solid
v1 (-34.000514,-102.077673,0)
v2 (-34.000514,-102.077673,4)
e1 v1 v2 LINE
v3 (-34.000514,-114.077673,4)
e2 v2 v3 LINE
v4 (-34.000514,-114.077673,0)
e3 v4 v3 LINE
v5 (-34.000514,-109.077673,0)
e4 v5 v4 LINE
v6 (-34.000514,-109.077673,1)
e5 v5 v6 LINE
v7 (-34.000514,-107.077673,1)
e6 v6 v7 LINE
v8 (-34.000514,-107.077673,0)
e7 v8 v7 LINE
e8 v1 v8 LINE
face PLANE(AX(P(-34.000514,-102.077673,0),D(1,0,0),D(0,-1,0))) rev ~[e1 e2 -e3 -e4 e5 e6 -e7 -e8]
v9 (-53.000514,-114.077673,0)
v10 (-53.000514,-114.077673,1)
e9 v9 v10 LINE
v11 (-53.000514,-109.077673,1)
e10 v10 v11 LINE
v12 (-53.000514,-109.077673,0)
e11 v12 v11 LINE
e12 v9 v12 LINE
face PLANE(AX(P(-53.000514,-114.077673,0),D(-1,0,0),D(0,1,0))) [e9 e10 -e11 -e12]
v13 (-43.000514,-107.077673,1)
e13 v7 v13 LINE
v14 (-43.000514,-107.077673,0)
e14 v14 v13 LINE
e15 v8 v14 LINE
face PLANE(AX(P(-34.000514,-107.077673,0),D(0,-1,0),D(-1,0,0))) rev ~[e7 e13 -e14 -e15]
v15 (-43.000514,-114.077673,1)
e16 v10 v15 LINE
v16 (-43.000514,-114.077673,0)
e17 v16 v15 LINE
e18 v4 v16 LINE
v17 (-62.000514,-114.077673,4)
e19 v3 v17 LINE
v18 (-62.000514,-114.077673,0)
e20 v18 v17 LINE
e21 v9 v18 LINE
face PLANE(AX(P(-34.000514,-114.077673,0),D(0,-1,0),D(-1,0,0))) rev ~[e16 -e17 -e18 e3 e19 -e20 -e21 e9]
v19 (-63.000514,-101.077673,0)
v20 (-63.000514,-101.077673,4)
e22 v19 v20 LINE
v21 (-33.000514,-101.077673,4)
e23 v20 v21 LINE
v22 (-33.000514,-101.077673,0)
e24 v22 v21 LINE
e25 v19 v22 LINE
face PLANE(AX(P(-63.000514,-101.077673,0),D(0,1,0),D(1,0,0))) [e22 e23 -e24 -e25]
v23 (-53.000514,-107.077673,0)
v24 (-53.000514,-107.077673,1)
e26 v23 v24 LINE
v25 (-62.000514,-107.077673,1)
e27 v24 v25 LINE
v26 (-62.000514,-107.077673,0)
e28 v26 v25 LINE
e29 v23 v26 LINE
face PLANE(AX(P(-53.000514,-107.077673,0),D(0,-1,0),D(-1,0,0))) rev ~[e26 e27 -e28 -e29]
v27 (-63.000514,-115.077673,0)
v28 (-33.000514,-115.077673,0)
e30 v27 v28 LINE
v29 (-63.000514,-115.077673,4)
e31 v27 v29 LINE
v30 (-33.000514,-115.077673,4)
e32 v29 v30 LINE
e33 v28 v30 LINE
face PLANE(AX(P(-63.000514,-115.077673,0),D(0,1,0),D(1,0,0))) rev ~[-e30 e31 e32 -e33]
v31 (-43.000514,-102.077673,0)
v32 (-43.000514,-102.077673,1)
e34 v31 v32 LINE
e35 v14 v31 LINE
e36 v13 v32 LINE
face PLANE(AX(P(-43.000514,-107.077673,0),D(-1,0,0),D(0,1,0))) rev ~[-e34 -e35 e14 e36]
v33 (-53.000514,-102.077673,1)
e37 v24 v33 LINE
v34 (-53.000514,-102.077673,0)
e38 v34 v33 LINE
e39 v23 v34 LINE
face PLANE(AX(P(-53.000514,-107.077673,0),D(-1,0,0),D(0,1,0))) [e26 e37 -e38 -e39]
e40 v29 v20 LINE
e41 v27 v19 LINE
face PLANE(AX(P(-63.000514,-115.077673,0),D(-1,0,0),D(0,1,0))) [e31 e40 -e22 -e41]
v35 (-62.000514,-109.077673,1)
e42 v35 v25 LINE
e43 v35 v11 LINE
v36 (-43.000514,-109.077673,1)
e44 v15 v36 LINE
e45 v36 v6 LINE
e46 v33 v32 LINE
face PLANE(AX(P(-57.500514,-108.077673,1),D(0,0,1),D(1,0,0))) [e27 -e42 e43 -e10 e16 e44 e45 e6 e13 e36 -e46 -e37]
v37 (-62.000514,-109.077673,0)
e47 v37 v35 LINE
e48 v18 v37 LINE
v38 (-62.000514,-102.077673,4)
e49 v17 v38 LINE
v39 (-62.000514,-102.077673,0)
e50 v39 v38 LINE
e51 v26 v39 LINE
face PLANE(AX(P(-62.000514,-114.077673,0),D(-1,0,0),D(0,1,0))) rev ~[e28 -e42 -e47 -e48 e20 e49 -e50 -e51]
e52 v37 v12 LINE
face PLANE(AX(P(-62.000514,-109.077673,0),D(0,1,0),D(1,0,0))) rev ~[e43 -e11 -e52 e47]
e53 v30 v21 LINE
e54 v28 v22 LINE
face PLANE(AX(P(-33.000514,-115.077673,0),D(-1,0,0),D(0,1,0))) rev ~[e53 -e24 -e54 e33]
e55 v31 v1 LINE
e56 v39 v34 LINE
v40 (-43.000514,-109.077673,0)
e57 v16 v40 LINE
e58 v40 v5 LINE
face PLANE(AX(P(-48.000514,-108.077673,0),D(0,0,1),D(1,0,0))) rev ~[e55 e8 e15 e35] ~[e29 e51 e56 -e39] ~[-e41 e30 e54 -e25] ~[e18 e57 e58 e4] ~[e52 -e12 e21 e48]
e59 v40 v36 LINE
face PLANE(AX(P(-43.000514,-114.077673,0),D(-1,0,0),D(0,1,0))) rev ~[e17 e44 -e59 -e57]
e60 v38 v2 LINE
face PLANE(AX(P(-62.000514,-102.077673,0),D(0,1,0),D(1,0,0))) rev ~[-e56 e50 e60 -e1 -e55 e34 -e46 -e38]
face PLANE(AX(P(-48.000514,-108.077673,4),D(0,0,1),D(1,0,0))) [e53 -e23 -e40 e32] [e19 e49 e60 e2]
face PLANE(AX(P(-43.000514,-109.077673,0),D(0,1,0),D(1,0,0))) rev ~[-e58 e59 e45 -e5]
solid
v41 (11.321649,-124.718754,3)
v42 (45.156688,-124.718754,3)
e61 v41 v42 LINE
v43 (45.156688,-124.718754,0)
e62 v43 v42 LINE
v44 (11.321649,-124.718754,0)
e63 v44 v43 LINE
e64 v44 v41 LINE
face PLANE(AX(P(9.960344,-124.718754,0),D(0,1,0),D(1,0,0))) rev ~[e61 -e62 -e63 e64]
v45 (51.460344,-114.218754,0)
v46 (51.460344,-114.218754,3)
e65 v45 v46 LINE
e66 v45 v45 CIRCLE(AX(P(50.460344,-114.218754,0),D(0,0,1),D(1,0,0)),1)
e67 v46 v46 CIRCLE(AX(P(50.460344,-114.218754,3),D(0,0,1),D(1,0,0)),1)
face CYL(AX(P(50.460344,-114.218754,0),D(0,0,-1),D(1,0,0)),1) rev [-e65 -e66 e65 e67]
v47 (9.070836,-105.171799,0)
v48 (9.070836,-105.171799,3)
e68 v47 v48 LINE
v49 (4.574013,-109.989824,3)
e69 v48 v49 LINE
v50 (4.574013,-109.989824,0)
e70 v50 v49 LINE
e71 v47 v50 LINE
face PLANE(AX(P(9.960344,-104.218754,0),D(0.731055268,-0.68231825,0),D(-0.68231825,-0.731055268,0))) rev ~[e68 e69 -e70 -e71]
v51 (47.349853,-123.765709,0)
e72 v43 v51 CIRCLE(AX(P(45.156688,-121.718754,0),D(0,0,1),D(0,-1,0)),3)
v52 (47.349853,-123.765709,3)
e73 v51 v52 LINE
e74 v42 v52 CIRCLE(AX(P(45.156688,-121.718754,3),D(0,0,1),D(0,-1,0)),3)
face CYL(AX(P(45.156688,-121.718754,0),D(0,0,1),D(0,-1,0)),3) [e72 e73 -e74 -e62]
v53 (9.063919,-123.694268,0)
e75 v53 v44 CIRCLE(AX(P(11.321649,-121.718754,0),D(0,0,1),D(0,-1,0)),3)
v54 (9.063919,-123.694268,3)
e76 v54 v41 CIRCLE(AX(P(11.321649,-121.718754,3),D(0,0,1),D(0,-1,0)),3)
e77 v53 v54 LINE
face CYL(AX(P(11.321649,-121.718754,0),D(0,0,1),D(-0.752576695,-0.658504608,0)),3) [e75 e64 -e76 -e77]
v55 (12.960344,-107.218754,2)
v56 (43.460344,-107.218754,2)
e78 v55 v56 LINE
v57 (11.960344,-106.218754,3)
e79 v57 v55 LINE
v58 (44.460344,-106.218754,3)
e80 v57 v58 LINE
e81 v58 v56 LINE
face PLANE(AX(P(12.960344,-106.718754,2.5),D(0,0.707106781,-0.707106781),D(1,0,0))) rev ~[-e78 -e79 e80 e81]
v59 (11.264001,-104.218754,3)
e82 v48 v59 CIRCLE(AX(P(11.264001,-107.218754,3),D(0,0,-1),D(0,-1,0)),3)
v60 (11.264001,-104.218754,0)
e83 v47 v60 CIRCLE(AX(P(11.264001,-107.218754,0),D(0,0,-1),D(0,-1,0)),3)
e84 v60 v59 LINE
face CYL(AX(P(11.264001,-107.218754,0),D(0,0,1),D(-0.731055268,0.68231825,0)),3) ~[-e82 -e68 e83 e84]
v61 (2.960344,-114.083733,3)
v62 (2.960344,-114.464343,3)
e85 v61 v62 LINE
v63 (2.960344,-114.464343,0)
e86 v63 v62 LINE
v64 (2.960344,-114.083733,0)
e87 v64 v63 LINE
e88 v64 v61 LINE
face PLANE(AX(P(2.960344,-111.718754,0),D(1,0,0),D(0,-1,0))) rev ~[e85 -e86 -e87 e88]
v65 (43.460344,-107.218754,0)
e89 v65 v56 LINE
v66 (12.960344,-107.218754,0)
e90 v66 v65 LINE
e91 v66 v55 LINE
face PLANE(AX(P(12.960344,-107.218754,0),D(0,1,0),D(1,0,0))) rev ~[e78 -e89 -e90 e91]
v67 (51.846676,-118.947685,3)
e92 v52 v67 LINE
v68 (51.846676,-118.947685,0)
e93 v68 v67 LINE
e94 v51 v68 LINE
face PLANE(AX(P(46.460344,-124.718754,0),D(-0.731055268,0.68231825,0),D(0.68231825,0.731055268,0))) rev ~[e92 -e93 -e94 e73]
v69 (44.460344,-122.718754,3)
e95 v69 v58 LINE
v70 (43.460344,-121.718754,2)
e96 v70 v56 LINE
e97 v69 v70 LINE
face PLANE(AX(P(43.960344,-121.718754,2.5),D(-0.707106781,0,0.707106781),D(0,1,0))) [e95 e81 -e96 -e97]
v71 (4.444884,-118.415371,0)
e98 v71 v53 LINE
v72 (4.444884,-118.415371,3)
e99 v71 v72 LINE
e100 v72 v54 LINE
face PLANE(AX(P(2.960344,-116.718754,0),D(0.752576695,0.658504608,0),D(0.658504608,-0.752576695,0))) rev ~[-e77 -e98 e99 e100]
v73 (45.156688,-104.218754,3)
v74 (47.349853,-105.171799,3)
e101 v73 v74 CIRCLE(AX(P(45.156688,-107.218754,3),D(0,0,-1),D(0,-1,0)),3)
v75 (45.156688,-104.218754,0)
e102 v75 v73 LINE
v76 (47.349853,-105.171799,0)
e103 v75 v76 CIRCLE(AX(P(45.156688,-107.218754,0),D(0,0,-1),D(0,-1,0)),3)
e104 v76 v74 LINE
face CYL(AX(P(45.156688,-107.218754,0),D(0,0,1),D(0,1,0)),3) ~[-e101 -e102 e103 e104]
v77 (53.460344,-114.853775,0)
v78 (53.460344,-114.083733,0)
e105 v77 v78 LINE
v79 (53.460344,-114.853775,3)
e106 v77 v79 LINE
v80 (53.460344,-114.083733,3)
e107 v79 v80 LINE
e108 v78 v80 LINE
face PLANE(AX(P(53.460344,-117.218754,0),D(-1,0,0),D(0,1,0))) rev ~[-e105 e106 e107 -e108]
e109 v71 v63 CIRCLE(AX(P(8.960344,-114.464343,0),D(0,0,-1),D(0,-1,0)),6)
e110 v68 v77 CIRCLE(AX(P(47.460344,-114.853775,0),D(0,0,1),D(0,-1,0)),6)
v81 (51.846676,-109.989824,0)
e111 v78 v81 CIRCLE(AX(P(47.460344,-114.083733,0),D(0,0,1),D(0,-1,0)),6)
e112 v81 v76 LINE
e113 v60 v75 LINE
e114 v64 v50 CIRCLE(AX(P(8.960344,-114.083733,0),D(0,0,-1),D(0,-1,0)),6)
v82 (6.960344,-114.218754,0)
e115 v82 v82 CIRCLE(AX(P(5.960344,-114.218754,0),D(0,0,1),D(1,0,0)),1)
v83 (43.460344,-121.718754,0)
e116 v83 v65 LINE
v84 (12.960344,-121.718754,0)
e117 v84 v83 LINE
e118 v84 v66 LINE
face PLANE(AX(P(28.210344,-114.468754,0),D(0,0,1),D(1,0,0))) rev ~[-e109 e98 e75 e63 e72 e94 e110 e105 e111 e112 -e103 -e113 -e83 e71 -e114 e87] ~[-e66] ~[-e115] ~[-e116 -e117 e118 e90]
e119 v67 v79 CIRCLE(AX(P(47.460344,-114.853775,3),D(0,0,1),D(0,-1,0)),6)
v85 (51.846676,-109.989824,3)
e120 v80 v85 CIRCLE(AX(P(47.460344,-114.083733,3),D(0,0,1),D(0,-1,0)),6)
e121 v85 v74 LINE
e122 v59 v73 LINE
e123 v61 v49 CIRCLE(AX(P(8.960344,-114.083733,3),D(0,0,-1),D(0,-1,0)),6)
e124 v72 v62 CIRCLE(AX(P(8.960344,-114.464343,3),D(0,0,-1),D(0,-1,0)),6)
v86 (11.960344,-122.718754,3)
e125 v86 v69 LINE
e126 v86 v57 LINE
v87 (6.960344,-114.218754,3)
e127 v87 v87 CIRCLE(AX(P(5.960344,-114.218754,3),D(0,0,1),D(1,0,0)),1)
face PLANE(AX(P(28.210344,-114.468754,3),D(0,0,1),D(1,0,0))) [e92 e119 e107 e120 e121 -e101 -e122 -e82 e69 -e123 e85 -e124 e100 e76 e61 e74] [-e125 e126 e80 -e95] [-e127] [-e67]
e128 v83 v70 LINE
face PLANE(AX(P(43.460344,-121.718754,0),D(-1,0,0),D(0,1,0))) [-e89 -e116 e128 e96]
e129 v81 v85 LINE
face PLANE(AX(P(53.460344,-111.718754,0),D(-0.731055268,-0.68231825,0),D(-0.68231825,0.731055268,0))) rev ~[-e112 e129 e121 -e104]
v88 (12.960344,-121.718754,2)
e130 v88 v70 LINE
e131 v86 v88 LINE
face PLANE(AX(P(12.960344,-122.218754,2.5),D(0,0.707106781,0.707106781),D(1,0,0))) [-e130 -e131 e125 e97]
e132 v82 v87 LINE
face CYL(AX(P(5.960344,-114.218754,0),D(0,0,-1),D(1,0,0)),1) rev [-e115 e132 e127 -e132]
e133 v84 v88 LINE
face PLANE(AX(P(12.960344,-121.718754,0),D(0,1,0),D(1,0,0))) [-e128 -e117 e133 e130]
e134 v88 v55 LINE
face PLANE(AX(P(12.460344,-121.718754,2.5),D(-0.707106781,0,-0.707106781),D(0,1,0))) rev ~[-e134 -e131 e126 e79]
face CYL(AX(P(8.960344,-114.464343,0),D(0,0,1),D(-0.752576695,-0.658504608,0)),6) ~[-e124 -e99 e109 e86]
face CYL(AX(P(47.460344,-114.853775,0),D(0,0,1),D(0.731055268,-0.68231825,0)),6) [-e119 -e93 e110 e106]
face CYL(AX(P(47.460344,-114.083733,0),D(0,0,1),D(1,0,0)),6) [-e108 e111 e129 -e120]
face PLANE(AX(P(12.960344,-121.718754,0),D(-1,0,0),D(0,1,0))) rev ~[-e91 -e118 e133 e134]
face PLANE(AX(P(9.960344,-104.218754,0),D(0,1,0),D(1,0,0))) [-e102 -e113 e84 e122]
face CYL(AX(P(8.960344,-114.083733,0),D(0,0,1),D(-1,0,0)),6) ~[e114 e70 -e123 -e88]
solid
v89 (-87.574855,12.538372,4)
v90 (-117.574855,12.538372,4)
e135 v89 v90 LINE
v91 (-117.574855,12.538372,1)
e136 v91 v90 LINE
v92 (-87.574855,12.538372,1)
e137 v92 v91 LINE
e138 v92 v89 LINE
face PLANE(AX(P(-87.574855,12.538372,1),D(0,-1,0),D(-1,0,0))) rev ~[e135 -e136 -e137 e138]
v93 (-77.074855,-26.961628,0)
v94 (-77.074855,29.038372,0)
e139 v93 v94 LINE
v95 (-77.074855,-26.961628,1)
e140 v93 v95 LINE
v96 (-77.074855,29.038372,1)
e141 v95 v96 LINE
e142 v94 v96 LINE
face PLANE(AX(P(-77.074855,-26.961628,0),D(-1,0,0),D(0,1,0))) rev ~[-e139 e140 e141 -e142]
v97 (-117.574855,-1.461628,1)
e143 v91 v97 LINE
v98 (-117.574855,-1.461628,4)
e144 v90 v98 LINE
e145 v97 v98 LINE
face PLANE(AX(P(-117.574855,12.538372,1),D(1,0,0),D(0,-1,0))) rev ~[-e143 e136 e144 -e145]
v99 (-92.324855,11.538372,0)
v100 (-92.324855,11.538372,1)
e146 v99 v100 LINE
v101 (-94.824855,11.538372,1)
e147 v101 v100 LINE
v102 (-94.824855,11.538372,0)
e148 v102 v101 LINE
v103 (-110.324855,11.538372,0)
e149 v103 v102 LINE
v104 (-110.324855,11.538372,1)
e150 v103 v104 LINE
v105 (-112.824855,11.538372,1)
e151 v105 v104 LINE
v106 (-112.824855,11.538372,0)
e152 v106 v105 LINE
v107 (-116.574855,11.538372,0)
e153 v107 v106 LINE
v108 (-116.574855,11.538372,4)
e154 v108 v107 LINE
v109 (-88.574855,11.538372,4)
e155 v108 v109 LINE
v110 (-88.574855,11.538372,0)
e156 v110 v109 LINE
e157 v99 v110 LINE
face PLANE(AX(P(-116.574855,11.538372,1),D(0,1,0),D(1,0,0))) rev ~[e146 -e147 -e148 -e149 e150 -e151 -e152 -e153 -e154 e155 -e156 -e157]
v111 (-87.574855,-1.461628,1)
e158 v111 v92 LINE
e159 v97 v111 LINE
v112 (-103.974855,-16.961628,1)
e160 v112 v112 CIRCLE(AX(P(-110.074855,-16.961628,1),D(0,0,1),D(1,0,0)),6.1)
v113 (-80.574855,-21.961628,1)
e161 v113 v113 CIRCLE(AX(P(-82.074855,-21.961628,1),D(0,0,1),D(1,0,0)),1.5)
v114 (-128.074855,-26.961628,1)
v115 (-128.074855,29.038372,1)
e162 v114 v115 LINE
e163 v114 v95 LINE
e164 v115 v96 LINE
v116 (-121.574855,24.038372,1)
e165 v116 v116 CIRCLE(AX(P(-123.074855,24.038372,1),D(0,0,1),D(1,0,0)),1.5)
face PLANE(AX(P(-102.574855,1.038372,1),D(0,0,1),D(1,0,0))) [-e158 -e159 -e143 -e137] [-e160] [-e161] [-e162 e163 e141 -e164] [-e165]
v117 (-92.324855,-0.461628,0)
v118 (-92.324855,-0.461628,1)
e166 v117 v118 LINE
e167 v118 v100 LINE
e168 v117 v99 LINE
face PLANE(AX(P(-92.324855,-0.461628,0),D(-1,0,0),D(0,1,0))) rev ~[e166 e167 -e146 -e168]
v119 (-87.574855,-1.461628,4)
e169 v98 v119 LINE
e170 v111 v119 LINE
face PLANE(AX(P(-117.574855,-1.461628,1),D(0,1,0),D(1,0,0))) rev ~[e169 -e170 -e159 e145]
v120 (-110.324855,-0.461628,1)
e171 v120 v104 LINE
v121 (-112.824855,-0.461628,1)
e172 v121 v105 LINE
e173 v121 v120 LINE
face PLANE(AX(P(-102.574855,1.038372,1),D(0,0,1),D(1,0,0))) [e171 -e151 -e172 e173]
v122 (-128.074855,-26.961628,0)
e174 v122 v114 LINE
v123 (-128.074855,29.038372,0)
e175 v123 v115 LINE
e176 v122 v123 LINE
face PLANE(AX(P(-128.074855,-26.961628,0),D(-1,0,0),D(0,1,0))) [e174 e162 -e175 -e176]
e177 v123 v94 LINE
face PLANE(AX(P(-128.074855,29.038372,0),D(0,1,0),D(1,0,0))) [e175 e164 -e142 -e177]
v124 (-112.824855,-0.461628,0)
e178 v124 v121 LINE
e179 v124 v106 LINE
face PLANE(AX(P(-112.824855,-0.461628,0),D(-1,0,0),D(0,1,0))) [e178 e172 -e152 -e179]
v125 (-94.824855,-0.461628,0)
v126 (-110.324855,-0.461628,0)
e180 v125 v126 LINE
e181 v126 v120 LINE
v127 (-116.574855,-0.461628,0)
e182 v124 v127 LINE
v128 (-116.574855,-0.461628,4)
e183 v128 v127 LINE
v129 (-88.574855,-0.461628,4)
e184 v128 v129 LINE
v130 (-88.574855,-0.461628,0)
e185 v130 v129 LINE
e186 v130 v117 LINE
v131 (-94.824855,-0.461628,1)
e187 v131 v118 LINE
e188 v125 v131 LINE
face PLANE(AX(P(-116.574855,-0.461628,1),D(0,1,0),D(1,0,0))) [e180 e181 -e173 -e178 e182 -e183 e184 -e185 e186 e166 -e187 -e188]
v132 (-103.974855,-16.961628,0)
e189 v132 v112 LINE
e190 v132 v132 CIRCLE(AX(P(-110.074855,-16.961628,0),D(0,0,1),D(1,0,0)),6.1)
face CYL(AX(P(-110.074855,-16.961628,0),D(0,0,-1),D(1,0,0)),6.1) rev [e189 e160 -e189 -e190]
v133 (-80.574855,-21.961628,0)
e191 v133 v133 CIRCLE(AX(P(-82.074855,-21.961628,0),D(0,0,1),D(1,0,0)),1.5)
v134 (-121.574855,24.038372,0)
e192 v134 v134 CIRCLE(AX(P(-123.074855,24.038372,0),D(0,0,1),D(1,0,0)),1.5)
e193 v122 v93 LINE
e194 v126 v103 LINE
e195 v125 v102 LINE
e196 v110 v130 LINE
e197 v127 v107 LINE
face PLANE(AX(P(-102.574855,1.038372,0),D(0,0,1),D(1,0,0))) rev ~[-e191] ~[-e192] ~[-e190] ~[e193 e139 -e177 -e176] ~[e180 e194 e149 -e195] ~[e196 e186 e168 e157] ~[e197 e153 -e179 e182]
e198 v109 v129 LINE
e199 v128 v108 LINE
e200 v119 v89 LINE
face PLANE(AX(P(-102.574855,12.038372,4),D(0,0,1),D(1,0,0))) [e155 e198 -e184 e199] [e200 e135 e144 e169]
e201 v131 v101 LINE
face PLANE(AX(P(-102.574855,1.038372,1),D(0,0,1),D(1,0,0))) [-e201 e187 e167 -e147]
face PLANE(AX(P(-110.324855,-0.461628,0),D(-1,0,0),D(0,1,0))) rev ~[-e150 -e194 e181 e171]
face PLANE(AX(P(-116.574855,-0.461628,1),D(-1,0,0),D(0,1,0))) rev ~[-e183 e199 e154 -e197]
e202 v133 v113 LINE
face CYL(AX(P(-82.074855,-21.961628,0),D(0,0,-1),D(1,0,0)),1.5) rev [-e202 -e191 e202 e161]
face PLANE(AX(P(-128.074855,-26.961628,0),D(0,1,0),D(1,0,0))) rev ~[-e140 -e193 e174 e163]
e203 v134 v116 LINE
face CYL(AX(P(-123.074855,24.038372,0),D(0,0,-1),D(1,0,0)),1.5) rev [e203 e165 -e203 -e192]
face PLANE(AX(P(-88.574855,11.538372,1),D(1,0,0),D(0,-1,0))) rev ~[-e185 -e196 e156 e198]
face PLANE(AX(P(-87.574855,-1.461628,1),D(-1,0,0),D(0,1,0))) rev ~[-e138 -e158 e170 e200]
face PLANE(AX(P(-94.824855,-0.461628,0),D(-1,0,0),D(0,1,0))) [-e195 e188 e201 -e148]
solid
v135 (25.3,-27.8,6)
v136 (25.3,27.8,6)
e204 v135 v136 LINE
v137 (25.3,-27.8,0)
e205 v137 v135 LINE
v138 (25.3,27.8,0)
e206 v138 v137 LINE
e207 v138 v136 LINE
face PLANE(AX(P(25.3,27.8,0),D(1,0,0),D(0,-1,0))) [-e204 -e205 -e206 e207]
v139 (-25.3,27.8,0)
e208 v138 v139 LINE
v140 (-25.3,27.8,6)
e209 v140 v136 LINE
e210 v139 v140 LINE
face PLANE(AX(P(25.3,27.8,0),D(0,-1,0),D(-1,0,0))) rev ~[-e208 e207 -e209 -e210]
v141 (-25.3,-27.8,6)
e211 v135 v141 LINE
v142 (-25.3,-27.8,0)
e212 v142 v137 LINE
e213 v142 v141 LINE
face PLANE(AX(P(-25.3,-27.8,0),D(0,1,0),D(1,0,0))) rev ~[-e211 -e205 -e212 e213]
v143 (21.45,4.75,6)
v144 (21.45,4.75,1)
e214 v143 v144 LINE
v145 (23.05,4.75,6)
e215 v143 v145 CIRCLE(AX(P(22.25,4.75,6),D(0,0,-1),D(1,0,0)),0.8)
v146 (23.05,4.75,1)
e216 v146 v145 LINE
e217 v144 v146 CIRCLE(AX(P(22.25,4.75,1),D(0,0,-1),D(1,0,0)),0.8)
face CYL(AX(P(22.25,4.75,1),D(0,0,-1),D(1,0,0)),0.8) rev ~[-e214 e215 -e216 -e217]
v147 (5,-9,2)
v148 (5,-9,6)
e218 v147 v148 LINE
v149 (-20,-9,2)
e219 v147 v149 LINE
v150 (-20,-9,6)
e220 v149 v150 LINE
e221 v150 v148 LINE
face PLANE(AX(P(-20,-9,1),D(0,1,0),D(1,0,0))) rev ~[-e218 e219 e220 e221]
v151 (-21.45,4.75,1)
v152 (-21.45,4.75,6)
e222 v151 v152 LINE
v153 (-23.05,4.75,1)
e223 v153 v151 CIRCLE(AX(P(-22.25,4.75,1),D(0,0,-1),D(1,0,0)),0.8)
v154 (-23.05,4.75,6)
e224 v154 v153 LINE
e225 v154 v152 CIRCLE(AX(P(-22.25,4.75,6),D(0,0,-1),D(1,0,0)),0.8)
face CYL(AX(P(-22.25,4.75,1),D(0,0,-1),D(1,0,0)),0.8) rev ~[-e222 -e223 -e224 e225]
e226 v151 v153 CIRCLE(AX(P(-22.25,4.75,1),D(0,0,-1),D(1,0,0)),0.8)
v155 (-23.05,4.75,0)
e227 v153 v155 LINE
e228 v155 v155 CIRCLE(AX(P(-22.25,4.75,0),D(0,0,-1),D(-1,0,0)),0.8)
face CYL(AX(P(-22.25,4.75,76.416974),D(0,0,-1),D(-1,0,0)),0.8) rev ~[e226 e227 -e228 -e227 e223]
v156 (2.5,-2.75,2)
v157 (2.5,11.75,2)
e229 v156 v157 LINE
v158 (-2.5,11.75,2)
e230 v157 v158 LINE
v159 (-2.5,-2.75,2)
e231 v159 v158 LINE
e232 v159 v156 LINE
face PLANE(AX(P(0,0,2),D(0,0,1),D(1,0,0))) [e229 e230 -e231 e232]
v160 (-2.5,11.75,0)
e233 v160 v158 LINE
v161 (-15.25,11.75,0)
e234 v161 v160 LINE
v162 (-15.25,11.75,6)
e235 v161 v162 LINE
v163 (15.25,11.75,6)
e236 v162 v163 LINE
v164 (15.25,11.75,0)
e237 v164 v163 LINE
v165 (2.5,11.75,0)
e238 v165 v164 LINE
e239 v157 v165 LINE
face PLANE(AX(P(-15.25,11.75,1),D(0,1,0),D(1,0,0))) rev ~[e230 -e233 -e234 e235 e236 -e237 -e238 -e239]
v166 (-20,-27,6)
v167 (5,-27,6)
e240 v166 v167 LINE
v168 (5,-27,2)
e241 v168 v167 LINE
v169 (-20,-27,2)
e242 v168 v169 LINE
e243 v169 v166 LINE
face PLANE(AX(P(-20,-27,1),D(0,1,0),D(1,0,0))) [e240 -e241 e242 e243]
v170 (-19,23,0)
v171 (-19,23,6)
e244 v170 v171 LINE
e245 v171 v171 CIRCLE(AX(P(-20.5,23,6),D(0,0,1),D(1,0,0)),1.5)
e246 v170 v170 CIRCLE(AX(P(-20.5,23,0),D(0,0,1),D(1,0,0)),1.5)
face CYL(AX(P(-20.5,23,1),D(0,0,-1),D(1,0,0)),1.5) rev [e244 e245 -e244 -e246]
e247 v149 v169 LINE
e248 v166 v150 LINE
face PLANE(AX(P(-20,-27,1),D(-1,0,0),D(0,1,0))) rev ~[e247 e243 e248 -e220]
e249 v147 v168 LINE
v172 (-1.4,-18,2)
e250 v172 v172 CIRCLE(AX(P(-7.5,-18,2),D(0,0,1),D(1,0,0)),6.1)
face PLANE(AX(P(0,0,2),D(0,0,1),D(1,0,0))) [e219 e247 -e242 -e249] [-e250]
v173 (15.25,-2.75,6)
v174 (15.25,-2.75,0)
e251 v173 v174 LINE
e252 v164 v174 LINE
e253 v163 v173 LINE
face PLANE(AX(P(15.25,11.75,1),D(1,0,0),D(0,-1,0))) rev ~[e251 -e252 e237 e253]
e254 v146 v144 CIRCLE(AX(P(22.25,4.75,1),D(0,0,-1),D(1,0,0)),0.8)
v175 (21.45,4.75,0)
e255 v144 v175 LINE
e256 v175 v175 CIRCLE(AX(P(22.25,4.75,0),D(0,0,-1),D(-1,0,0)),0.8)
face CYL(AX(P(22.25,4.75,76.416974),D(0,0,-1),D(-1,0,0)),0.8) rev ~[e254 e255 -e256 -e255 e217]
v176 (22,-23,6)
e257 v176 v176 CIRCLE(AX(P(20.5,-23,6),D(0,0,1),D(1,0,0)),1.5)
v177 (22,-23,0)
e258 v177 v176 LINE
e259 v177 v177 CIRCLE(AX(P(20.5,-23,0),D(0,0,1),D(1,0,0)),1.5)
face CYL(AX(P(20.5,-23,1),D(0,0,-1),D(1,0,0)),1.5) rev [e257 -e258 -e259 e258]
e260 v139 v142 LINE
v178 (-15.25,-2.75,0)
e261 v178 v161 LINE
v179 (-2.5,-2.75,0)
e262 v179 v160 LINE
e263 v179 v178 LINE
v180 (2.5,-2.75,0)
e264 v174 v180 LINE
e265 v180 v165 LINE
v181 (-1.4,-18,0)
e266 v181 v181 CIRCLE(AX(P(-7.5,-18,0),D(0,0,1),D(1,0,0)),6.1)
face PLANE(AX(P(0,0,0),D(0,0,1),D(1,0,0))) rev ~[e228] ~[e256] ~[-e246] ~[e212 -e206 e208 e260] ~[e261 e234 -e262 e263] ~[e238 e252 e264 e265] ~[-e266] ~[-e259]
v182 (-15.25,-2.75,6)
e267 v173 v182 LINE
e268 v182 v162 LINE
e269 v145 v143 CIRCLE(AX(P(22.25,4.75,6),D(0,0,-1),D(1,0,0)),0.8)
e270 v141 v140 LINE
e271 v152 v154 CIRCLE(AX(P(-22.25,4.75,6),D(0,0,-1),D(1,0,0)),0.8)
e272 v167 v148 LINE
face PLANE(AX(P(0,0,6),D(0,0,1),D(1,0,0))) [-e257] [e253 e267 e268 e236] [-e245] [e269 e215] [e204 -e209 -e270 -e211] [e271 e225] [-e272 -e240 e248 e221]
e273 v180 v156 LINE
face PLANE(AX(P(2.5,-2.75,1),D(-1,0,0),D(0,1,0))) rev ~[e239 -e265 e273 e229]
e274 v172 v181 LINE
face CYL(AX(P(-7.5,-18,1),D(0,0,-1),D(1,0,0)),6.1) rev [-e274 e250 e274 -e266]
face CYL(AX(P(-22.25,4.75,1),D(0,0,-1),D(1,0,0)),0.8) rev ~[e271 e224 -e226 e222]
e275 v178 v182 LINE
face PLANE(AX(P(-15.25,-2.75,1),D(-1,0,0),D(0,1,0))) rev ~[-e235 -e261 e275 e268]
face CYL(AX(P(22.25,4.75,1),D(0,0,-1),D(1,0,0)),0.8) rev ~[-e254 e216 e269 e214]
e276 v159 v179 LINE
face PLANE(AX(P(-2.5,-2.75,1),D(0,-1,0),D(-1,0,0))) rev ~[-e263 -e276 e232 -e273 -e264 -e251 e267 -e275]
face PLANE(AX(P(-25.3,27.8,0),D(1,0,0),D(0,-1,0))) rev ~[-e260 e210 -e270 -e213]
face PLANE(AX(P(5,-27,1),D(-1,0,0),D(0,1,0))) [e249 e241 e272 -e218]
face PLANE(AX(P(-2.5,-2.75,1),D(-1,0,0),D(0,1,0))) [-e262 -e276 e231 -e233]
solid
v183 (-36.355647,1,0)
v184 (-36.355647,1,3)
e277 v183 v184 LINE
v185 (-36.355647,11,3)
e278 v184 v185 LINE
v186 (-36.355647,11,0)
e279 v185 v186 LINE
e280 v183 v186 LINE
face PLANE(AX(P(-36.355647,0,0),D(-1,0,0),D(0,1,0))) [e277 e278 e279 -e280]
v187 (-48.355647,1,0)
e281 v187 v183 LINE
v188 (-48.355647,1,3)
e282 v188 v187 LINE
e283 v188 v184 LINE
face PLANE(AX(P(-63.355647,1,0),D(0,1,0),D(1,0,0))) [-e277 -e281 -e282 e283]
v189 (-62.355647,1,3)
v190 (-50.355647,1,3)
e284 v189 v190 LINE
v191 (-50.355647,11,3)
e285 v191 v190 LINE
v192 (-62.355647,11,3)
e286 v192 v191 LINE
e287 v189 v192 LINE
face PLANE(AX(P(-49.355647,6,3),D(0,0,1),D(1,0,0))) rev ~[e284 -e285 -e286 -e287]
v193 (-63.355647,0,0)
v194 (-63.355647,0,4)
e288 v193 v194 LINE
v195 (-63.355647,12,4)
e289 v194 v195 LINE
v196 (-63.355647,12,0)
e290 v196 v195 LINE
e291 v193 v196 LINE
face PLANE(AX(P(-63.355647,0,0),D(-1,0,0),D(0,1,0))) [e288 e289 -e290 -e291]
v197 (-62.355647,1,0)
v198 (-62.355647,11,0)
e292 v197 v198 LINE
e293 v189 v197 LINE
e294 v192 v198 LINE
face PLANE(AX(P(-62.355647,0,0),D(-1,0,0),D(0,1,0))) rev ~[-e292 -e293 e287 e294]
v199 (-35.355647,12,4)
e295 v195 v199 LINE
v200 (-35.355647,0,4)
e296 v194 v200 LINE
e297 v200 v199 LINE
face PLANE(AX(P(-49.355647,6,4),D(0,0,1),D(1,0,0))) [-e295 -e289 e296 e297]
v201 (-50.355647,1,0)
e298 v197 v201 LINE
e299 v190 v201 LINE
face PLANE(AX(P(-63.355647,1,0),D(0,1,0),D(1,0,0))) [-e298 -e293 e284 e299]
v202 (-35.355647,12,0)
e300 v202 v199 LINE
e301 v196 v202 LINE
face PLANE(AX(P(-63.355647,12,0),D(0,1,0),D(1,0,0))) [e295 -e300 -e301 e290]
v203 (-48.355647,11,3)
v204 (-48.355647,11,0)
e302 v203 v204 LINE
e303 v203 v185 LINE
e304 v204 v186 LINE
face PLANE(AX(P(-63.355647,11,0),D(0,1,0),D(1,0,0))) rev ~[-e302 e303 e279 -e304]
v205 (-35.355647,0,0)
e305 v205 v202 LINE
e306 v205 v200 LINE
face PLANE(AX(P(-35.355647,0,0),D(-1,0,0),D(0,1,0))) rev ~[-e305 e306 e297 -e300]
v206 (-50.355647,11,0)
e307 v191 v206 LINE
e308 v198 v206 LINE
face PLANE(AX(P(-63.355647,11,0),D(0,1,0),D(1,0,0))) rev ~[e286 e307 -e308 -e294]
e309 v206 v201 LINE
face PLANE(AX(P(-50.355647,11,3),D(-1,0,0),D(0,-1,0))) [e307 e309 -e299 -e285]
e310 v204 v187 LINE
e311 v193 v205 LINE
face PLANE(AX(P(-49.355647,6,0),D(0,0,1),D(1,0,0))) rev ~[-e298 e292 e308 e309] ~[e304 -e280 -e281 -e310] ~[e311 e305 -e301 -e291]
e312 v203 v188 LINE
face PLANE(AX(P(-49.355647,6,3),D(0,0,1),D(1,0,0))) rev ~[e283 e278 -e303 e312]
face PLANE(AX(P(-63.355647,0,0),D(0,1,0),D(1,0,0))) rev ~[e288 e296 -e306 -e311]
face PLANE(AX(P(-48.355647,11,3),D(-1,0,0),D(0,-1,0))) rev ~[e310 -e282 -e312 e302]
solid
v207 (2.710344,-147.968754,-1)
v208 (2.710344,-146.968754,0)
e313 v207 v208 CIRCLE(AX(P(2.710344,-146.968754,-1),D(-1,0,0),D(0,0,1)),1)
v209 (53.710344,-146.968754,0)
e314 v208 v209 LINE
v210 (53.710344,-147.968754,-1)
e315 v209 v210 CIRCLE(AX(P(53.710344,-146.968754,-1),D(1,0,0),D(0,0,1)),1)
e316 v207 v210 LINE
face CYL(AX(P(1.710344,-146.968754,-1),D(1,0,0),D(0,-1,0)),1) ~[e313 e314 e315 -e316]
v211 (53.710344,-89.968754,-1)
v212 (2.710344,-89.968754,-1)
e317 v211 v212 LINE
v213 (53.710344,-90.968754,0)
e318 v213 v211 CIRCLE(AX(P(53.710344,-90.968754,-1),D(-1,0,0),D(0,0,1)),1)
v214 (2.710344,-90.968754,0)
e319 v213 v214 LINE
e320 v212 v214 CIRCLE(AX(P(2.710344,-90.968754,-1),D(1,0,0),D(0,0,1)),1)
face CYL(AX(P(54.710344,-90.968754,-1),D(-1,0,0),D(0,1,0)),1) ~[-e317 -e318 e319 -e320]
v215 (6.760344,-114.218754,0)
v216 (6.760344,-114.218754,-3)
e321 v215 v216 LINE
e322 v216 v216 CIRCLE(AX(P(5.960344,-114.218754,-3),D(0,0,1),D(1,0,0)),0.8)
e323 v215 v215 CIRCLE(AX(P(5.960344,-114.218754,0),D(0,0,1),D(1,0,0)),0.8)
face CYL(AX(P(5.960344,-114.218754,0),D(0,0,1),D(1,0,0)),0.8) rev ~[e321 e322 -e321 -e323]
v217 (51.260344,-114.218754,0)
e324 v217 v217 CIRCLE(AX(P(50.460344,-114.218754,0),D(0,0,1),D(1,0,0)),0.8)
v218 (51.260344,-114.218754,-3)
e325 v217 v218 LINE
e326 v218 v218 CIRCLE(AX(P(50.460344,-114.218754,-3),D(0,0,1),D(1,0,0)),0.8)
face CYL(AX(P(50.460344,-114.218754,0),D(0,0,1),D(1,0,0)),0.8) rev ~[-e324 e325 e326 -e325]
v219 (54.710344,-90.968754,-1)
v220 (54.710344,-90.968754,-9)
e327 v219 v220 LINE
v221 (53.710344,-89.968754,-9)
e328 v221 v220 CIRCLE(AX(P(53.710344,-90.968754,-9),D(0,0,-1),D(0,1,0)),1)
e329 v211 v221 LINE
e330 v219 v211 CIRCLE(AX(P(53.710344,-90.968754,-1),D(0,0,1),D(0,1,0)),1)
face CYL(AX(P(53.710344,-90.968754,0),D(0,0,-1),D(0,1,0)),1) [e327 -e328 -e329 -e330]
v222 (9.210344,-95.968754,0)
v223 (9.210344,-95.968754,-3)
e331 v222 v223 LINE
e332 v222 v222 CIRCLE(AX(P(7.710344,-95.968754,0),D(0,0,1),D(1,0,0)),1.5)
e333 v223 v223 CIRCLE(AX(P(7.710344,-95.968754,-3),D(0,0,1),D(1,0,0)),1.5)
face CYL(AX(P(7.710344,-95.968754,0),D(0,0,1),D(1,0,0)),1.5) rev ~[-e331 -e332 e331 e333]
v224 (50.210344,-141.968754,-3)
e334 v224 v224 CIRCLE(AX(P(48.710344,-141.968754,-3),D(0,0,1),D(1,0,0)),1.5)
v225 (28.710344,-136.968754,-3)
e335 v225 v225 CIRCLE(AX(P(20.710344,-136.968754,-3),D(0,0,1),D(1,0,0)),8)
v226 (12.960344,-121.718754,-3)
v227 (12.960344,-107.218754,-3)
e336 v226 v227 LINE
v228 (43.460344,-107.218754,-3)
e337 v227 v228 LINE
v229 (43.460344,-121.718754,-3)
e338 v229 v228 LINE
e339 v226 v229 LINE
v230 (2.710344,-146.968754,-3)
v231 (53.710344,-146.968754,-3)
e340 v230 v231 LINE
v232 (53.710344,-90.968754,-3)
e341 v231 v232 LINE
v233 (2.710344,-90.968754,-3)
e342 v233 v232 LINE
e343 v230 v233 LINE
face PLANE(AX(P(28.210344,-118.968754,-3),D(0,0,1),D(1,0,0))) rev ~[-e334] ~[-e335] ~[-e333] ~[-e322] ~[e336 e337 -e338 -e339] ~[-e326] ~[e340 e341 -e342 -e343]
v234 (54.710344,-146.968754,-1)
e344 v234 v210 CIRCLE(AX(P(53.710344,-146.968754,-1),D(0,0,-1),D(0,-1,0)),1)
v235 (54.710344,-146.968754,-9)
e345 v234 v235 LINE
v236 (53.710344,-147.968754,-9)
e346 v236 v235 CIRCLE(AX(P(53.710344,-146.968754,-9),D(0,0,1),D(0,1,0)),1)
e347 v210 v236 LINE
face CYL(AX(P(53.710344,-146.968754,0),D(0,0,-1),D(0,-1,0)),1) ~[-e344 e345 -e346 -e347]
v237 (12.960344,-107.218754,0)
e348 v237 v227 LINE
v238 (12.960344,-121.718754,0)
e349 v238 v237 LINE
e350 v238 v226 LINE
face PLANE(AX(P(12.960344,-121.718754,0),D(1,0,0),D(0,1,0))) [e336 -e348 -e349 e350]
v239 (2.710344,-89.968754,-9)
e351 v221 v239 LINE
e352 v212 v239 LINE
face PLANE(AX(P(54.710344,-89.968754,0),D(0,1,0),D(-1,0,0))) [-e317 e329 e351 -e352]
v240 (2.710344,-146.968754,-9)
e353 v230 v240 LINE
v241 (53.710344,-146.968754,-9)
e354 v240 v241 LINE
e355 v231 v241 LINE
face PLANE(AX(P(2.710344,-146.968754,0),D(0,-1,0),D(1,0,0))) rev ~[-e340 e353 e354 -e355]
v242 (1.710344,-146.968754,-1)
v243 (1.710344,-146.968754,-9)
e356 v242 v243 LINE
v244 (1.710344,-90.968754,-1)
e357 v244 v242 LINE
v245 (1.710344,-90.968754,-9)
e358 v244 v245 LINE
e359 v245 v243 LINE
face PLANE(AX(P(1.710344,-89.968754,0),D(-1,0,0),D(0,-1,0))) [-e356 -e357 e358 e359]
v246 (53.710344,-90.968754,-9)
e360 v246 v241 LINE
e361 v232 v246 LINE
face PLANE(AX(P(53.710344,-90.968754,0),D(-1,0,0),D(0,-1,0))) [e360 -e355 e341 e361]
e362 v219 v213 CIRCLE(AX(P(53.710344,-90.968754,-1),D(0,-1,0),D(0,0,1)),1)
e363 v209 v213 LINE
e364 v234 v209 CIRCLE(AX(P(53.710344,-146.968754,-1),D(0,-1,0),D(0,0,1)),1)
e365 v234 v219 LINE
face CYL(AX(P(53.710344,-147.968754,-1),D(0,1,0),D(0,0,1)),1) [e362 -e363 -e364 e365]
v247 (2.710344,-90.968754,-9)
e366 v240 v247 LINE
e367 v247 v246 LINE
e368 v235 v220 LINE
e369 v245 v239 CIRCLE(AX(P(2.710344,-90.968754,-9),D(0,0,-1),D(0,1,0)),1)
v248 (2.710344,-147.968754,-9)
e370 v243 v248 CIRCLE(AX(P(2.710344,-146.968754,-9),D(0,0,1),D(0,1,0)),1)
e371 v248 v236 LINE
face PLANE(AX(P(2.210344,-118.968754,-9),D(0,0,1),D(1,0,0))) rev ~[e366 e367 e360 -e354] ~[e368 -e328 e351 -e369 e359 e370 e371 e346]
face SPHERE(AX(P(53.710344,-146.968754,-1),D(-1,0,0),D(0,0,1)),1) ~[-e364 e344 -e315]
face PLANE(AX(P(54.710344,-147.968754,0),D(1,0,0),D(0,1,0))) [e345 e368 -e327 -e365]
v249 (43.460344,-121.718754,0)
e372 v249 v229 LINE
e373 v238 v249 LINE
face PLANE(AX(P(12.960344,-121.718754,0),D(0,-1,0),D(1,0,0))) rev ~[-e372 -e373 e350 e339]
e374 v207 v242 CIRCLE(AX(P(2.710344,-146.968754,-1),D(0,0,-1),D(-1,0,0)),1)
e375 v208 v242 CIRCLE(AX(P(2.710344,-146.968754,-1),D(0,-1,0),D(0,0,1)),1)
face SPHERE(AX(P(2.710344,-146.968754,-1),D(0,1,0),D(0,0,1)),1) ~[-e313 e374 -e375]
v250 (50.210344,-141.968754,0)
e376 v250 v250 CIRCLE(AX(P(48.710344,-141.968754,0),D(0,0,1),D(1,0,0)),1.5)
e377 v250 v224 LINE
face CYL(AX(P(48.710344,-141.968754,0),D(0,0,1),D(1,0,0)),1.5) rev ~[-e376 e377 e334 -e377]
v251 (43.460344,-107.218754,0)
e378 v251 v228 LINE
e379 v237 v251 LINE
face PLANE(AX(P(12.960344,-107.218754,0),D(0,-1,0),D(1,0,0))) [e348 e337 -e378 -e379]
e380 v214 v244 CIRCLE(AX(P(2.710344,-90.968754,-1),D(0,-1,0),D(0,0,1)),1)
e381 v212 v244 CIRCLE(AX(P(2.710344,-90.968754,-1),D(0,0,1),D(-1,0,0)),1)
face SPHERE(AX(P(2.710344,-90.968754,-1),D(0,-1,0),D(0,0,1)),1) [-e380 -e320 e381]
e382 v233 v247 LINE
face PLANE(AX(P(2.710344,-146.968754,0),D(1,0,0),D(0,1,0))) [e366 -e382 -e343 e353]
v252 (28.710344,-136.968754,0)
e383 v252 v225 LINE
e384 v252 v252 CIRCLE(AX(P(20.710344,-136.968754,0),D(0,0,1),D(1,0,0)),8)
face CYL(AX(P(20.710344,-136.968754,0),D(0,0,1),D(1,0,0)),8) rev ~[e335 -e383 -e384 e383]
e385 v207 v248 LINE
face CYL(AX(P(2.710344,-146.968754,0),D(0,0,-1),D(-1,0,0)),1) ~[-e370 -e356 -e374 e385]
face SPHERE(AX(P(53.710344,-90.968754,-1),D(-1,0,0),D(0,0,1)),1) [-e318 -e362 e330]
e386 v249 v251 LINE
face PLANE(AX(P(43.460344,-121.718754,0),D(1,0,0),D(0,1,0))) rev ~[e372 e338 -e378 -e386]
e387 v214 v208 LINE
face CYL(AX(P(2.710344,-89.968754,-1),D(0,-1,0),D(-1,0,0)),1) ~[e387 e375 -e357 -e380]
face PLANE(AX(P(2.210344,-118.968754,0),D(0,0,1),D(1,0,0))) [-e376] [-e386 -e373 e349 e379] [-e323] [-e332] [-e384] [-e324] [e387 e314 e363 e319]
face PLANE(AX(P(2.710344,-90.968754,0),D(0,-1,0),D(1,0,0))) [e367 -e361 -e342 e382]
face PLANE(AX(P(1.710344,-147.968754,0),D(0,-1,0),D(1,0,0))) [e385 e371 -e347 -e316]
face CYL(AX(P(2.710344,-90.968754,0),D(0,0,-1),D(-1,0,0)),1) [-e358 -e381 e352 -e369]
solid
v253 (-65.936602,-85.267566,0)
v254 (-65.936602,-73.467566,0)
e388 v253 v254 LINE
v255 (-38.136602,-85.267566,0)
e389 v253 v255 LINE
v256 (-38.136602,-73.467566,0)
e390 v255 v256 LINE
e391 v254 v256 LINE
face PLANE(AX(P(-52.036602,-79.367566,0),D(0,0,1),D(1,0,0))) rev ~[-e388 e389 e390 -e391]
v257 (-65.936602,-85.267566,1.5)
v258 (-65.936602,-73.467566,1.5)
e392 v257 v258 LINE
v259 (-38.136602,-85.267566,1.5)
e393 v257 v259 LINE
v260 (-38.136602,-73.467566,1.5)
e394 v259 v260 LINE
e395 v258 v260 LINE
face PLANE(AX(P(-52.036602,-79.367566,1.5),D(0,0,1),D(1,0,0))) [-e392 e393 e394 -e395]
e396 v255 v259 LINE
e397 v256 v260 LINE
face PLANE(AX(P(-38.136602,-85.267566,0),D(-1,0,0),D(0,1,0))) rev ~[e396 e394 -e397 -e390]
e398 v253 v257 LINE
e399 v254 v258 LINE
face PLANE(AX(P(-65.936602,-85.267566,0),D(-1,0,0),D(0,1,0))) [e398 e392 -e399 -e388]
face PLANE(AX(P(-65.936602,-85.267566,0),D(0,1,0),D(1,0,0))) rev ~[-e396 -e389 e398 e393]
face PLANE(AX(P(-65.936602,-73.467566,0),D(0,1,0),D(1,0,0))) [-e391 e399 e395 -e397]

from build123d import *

# Parameters (mm, degrees)
F0_W      = 51
F0_H      = 56
F0_R      = 1.5
F0_R_2    = 6.1
F0_W_2    = 5
F0_H_2    = 14.5
F1_DEPTH  = 1
F0_W_3    = 2.5
F0_H_3    = 12
F3_W      = 28
F3_H      = 1
F4_DEPTH  = 3
F5_W      = 28
F5_H      = 12
F6_DEPTH  = 4
F7_T      = -1
F8_W      = 2
F8_H      = 10
F9_DEPTH  = 3
F2_W      = 30
F2_H      = 14
F11_DEPTH = 4
F2_W_2    = 51
F2_H_2    = 56
F2_R      = 8
F2_R_2    = 1.5
F2_R_3    = 0.8
F2_W_3    = 30.5
F2_H_3    = 14.5
F12_DEPTH = 3
F2_W_4    = 9
F2_H_4    = 2
F2_W_5    = 10
F2_H_5    = 5
F13_DEPTH = 1
F5_W_2    = 27.8
F5_H_2    = 11.8
F14_DEPTH = 1.5
F2_H_6    = 1
F15_DEPTH = 9
F16_W     = 36.5
F16_H     = 20.5
F16_W_2   = 30.5
F16_H_2   = 14.5
F16_R     = 1
F17_DEPTH = 3
F18_R     = 6
F19_R     = 3
F20_R     = 1
F21_SIZE  = 1
F24_DEPTH = 1
F25_D     = 1.4
F25_DEPTH = 1.001
F27_D     = 1.4
F22_W     = 51
F22_H     = 56
F22_W_2   = 25
F22_H_2   = 18
F22_R     = 1.5
F28_DEPTH = 5
F29_W     = 0.2
F29_H     = 55.6
F30_DEPTH = 25
F31_D     = 1.6
F31_DEPTH = 5.001
F32_D     = 1.6


# Not quite as in the source:
# - a feature names something its author has since deleted; it is built from what else it names


with BuildPart() as f1:
    # F0 (on Top) → F1 (new body)
    with BuildSketch(Plane.XY):
        Rectangle(F0_W, F0_H)
        with Locations((20.5, -23)):
            Circle(F0_R, mode=Mode.SUBTRACT)
        with Locations((-7.5, -18)):
            Circle(F0_R_2, mode=Mode.SUBTRACT)
        Polygon((-15.25, -2.75), (-15.25, 11.75), (-2.5, 11.75), (2.5, 11.75), (15.25, 11.75), (15.25, -2.75), (2.5, -2.75), (-2.5, -2.75), align=None, mode=Mode.SUBTRACT)
        with Locations((-20.5, 23)):
            Circle(F0_R, mode=Mode.SUBTRACT)
        with Locations((0, 4.5)):
            Rectangle(F0_W_2, F0_H_2)
    extrude(amount=F1_DEPTH)

    # F24 (add): a face of the model
    f24_faces = [f1.faces().sort_by_distance(p)[0] for p in [
        (0.3722548806, 0.1869472989, 1),
    ]]
    extrude(f24_faces, amount=F24_DEPTH)

    # F25 (through all, one way)
    with BuildSketch(Plane.XY.offset(1)):
        with Locations((-22.25, 4.75), (22.25, 4.75)):
            Circle(F25_D / 2)
    extrude(amount=-F25_DEPTH, mode=Mode.SUBTRACT)

    # F27 (through all)
    with Locations(Plane(origin=(0, 0, 1), x_dir=(1, 0, 0), z_dir=(0, 0, -1))):
        with Locations((-22.25, -4.75), (22.25, -4.75)):
            Hole(F27_D / 2)

    # F22 (on face) → F28 (join)
    with BuildSketch(Plane.XY.offset(1)):
        Rectangle(F22_W, F22_H)
        with Locations((-7.5, -18)):
            Rectangle(F22_W_2, F22_H_2, mode=Mode.SUBTRACT)
        with Locations((20.5, -23)):
            Circle(F22_R, mode=Mode.SUBTRACT)
        with Locations((-20.5, 23)):
            Circle(F22_R, mode=Mode.SUBTRACT)
        Polygon((-15.25, -2.75), (-15.25, 11.75), (-2.5, 11.75), (2.5, 11.75), (15.25, 11.75), (15.25, -2.75), (2.5, -2.75), (-2.5, -2.75), align=None, mode=Mode.SUBTRACT)
    extrude(amount=F28_DEPTH)

    # F29 (on face) → F30 (cut)
    with BuildSketch(Plane(origin=(0, 0, 0), x_dir=(1, 0, 0), z_dir=(0, 0, -1))):
        Polygon((25.5, 28), (-25.5, 28), (-25.5, 27.8), (-25.3, 27.8), (25.3, 27.8), (25.5, 27.8), align=None)
        with Locations((-25.4, 0)):
            Rectangle(F29_W, F29_H)
        with Locations((25.4, 0)):
            Rectangle(F29_W, F29_H)
        Polygon((-25.3, -27.8), (-25.5, -27.8), (-25.5, -28), (25.5, -28), (25.5, -27.8), (25.3, -27.8), align=None)
    extrude(amount=-F30_DEPTH, mode=Mode.SUBTRACT)

    # F31 (through all, one way)
    with BuildSketch(Plane(origin=(0, 0, 1), x_dir=(1, 0, 0), z_dir=(0, 0, -1))):
        with Locations((-22.25, -4.75), (22.25, -4.75)):
            Circle(F31_D / 2)
    extrude(amount=-F31_DEPTH, mode=Mode.SUBTRACT)

    # F32 (through all)
    with Locations(Plane.XY.offset(1)):
        with Locations((22.25, 4.75), (-22.25, 4.75)):
            Hole(F32_D / 2)


with BuildPart() as f1b:
    # F0 (on Top) → F1, piece 2 (new body)
    with BuildSketch(Plane.XY):
        with Locations((-102.5748546124, 1.0383715183)):
            Rectangle(F0_W, F0_H)
        with Locations((-110.0748546124, -16.9616284817)):
            Circle(F0_R_2, mode=Mode.SUBTRACT)
        with Locations((-82.0748546124, -21.9616284817)):
            Circle(F0_R, mode=Mode.SUBTRACT)
        Polygon((-116.5748546124, -0.4616284817), (-116.5748546124, 11.5383715183), (-112.8248546124, 11.5383715183), (-110.3248546124, 11.5383715183), (-94.8248546124, 11.5383715183), (-92.3248546124, 11.5383715183), (-88.5748546124, 11.5383715183), (-88.5748546124, -0.4616284817), (-92.3248546124, -0.4616284817), (-94.8248546124, -0.4616284817), (-110.3248546124, -0.4616284817), (-112.8248546124, -0.4616284817), align=None, mode=Mode.SUBTRACT)
        with Locations((-123.0748546124, 24.0383715183)):
            Circle(F0_R, mode=Mode.SUBTRACT)
        with Locations((-111.5748546124, 5.5383715183)):
            Rectangle(F0_W_3, F0_H_3)
        with Locations((-93.5748546124, 5.5383715183)):
            Rectangle(F0_W_3, F0_H_3)
    extrude(amount=F1_DEPTH)

    # F3 (on face) → F4 (join)
    with BuildSketch(Plane.XY.offset(1)):
        with Locations((-102.5748546124, 12.0383715183)):
            Rectangle(F3_W, F3_H)
        Polygon((-116.5748546124, -0.4616284817), (-116.5748546124, 11.5383715183), (-116.5748546124, 12.5383715183), (-117.5748546124, 12.5383715183), (-117.5748546124, -1.4616284817), (-116.5748546124, -1.4616284817), align=None)
        Polygon((-88.5748546124, 12.5383715183), (-88.5748546124, 11.5383715183), (-88.5748546124, -0.4616284817), (-88.5748546124, -1.4616284817), (-87.5748546124, -1.4616284817), (-87.5748546124, 12.5383715183), align=None)
        with Locations((-102.5748546124, -0.9616284817)):
            Rectangle(F3_W, F3_H)
    extrude(amount=F4_DEPTH)


with BuildPart() as f6:
    # F5 (on Top) → F6 (new body)
    with BuildSketch(Plane.XY):
        with Locations((-49.3556470275, 6)):
            Rectangle(F5_W, F5_H)
    extrude(amount=F6_DEPTH)

    # F7
    f7_openings = [f6.faces().sort_by_distance(p)[0] for p in [
        (-49.355647, 6, 0),
    ]]
    offset(amount=F7_T, openings=f7_openings)

    # F8 (on face) → F9 (join)
    with BuildSketch(Plane(origin=(0, 0, 3), x_dir=(1, 0, 0), z_dir=(0, 0, -1))):
        with Locations((-49.3556470275, -6)):
            Rectangle(F8_W, F8_H)
    extrude(amount=F9_DEPTH)


with BuildPart() as f11:
    # F2 (on Top) → F11 (new body)
    with BuildSketch(Plane.XY):
        with Locations((-48.0005137329, -108.0776734079)):
            Rectangle(F2_W, F2_H)
        Polygon((-62.0005137329, -107.0776734079), (-62.0005137329, -102.0776734079), (-53.0005137329, -102.0776734079), (-43.0005137329, -102.0776734079), (-34.0005137329, -102.0776734079), (-34.0005137329, -107.0776734079), (-34.0005137329, -109.0776734079), (-34.0005137329, -114.0776734079), (-43.0005137329, -114.0776734079), (-53.0005137329, -114.0776734079), (-62.0005137329, -114.0776734079), (-62.0005137329, -109.0776734079), align=None, mode=Mode.SUBTRACT)
    extrude(amount=F11_DEPTH)

    # F2 (on Top) → F13 (join)
    with BuildSketch(Plane.XY):
        with Locations((-57.5005137329, -108.0776734079)):
            Rectangle(F2_W_4, F2_H_4)
        with Locations((-48.0005137329, -108.0776734079)):
            Rectangle(F2_W_5, F2_H_4)
        with Locations((-38.5005137329, -108.0776734079)):
            Rectangle(F2_W_4, F2_H_4)
        with Locations((-48.0005137329, -104.5776734079)):
            Rectangle(F2_W_5, F2_H_5)
        with Locations((-48.0005137329, -111.5776734079)):
            Rectangle(F2_W_5, F2_H_5)
    extrude(amount=F13_DEPTH)


with BuildPart() as f12:
    # F2 (on Top) → F12 (new body)
    with BuildSketch(Plane.XY):
        with Locations((28.2103444552, -118.9687541723)):
            Rectangle(F2_W_2, F2_H_2)
        with Locations((20.7103444552, -136.9687541723)):
            Circle(F2_R, mode=Mode.SUBTRACT)
        with Locations((48.7103444552, -141.9687541723)):
            Circle(F2_R_2, mode=Mode.SUBTRACT)
        with Locations((5.9603444552, -114.2187541723)):
            Circle(F2_R_3, mode=Mode.SUBTRACT)
        with Locations((28.2103444552, -114.4687541723)):
            Rectangle(F2_W_3, F2_H_3, mode=Mode.SUBTRACT)
        with Locations((50.4603444552, -114.2187541723)):
            Circle(F2_R_3, mode=Mode.SUBTRACT)
        with Locations((7.7103444552, -95.9687541723)):
            Circle(F2_R_2, mode=Mode.SUBTRACT)
    extrude(amount=-F12_DEPTH)

    # F2 (on Top) → F15 (join)
    with BuildSketch(Plane.XY):
        Polygon((2.7103444552, -146.9687541723), (2.7103444552, -90.9687541723), (2.7103444552, -89.9687541723), (1.7103444552, -89.9687541723), (1.7103444552, -147.9687541723), (2.7103444552, -147.9687541723), align=None)
        with Locations((28.2103444552, -90.4687541723)):
            Rectangle(F2_W_2, F2_H_6)
        with Locations((28.2103444552, -147.4687541723)):
            Rectangle(F2_W_2, F2_H_6)
        Polygon((53.7103444552, -89.9687541723), (53.7103444552, -90.9687541723), (53.7103444552, -146.9687541723), (53.7103444552, -147.9687541723), (54.7103444552, -147.9687541723), (54.7103444552, -89.9687541723), align=None)
    extrude(amount=-F15_DEPTH)

    # F20
    f20_edges = [f12.edges().sort_by_distance(p)[0] for p in [
        (1.710344, -118.968754, 0),
        (28.210344, -89.968754, 0),
        (28.210344, -147.968754, 0),
        (54.710344, -118.968754, 0),
        (54.710344, -147.968754, -4.5),
        (1.710344, -147.968754, -4.5),
        (1.710344, -89.968754, -4.5),
        (54.710344, -89.968754, -4.5),
    ]]
    fillet(f20_edges, radius=F20_R)


with BuildPart() as f14:
    # F5 (on Top) → F14 (new body)
    with BuildSketch(Plane.XY):
        with Locations((-52.0366017878, -79.3675661445)):
            Rectangle(F5_W_2, F5_H_2)
    extrude(amount=F14_DEPTH)


with BuildPart() as f17:
    # F16 (on face) → F17 (new body)
    with BuildSketch(Plane.XY):
        with Locations((28.2103444552, -114.4687541723)):
            Rectangle(F16_W, F16_H)
        with Locations((28.2103444552, -114.4687541723)):
            Rectangle(F16_W_2, F16_H_2, mode=Mode.SUBTRACT)
        Polygon((9.9603444552, -124.7187541723), (9.9603444552, -104.2187541723), (2.9603444552, -111.7187541723), (2.9603444552, -116.7187541723), align=None)
        with Locations((5.9603444552, -114.2187541723)):
            Circle(F16_R, mode=Mode.SUBTRACT)
        Polygon((53.4603444552, -111.7187541723), (46.4603444552, -104.2187541723), (46.4603444552, -124.7187541723), (53.4603444552, -117.2187541723), align=None)
        with Locations((50.4603444552, -114.2187541723)):
            Circle(F16_R, mode=Mode.SUBTRACT)
    extrude(amount=F17_DEPTH)

    # F18
    f18_edges = [f17.edges().sort_by_distance(p)[0] for p in [
        (2.960344, -111.718754, 1.5),
        (2.960344, -116.718754, 1.5),
        (53.460344, -117.218754, 1.5),
        (53.460344, -111.718754, 1.5),
    ]]
    fillet(f18_edges, radius=F18_R)

    # F19
    f19_edges = [f17.edges().sort_by_distance(p)[0] for p in [
        (9.960344, -104.218754, 1.5),
        (9.960344, -124.718754, 1.5),
        (46.460344, -124.718754, 1.5),
        (46.460344, -104.218754, 1.5),
    ]]
    fillet(f19_edges, radius=F19_R)

    # F21
    f21_edges = [f17.edges().sort_by_distance(p)[0] for p in [
        (12.960344, -114.468754, 3),
        (28.210344, -107.218754, 3),
        (43.460344, -114.468754, 3),
        (28.210344, -121.718754, 3),
    ]]
    chamfer(f21_edges, length=F21_SIZE)


solid = Compound([f1.part, f1b.part, f6.part, f11.part, f12.part, f14.part, f17.part])
